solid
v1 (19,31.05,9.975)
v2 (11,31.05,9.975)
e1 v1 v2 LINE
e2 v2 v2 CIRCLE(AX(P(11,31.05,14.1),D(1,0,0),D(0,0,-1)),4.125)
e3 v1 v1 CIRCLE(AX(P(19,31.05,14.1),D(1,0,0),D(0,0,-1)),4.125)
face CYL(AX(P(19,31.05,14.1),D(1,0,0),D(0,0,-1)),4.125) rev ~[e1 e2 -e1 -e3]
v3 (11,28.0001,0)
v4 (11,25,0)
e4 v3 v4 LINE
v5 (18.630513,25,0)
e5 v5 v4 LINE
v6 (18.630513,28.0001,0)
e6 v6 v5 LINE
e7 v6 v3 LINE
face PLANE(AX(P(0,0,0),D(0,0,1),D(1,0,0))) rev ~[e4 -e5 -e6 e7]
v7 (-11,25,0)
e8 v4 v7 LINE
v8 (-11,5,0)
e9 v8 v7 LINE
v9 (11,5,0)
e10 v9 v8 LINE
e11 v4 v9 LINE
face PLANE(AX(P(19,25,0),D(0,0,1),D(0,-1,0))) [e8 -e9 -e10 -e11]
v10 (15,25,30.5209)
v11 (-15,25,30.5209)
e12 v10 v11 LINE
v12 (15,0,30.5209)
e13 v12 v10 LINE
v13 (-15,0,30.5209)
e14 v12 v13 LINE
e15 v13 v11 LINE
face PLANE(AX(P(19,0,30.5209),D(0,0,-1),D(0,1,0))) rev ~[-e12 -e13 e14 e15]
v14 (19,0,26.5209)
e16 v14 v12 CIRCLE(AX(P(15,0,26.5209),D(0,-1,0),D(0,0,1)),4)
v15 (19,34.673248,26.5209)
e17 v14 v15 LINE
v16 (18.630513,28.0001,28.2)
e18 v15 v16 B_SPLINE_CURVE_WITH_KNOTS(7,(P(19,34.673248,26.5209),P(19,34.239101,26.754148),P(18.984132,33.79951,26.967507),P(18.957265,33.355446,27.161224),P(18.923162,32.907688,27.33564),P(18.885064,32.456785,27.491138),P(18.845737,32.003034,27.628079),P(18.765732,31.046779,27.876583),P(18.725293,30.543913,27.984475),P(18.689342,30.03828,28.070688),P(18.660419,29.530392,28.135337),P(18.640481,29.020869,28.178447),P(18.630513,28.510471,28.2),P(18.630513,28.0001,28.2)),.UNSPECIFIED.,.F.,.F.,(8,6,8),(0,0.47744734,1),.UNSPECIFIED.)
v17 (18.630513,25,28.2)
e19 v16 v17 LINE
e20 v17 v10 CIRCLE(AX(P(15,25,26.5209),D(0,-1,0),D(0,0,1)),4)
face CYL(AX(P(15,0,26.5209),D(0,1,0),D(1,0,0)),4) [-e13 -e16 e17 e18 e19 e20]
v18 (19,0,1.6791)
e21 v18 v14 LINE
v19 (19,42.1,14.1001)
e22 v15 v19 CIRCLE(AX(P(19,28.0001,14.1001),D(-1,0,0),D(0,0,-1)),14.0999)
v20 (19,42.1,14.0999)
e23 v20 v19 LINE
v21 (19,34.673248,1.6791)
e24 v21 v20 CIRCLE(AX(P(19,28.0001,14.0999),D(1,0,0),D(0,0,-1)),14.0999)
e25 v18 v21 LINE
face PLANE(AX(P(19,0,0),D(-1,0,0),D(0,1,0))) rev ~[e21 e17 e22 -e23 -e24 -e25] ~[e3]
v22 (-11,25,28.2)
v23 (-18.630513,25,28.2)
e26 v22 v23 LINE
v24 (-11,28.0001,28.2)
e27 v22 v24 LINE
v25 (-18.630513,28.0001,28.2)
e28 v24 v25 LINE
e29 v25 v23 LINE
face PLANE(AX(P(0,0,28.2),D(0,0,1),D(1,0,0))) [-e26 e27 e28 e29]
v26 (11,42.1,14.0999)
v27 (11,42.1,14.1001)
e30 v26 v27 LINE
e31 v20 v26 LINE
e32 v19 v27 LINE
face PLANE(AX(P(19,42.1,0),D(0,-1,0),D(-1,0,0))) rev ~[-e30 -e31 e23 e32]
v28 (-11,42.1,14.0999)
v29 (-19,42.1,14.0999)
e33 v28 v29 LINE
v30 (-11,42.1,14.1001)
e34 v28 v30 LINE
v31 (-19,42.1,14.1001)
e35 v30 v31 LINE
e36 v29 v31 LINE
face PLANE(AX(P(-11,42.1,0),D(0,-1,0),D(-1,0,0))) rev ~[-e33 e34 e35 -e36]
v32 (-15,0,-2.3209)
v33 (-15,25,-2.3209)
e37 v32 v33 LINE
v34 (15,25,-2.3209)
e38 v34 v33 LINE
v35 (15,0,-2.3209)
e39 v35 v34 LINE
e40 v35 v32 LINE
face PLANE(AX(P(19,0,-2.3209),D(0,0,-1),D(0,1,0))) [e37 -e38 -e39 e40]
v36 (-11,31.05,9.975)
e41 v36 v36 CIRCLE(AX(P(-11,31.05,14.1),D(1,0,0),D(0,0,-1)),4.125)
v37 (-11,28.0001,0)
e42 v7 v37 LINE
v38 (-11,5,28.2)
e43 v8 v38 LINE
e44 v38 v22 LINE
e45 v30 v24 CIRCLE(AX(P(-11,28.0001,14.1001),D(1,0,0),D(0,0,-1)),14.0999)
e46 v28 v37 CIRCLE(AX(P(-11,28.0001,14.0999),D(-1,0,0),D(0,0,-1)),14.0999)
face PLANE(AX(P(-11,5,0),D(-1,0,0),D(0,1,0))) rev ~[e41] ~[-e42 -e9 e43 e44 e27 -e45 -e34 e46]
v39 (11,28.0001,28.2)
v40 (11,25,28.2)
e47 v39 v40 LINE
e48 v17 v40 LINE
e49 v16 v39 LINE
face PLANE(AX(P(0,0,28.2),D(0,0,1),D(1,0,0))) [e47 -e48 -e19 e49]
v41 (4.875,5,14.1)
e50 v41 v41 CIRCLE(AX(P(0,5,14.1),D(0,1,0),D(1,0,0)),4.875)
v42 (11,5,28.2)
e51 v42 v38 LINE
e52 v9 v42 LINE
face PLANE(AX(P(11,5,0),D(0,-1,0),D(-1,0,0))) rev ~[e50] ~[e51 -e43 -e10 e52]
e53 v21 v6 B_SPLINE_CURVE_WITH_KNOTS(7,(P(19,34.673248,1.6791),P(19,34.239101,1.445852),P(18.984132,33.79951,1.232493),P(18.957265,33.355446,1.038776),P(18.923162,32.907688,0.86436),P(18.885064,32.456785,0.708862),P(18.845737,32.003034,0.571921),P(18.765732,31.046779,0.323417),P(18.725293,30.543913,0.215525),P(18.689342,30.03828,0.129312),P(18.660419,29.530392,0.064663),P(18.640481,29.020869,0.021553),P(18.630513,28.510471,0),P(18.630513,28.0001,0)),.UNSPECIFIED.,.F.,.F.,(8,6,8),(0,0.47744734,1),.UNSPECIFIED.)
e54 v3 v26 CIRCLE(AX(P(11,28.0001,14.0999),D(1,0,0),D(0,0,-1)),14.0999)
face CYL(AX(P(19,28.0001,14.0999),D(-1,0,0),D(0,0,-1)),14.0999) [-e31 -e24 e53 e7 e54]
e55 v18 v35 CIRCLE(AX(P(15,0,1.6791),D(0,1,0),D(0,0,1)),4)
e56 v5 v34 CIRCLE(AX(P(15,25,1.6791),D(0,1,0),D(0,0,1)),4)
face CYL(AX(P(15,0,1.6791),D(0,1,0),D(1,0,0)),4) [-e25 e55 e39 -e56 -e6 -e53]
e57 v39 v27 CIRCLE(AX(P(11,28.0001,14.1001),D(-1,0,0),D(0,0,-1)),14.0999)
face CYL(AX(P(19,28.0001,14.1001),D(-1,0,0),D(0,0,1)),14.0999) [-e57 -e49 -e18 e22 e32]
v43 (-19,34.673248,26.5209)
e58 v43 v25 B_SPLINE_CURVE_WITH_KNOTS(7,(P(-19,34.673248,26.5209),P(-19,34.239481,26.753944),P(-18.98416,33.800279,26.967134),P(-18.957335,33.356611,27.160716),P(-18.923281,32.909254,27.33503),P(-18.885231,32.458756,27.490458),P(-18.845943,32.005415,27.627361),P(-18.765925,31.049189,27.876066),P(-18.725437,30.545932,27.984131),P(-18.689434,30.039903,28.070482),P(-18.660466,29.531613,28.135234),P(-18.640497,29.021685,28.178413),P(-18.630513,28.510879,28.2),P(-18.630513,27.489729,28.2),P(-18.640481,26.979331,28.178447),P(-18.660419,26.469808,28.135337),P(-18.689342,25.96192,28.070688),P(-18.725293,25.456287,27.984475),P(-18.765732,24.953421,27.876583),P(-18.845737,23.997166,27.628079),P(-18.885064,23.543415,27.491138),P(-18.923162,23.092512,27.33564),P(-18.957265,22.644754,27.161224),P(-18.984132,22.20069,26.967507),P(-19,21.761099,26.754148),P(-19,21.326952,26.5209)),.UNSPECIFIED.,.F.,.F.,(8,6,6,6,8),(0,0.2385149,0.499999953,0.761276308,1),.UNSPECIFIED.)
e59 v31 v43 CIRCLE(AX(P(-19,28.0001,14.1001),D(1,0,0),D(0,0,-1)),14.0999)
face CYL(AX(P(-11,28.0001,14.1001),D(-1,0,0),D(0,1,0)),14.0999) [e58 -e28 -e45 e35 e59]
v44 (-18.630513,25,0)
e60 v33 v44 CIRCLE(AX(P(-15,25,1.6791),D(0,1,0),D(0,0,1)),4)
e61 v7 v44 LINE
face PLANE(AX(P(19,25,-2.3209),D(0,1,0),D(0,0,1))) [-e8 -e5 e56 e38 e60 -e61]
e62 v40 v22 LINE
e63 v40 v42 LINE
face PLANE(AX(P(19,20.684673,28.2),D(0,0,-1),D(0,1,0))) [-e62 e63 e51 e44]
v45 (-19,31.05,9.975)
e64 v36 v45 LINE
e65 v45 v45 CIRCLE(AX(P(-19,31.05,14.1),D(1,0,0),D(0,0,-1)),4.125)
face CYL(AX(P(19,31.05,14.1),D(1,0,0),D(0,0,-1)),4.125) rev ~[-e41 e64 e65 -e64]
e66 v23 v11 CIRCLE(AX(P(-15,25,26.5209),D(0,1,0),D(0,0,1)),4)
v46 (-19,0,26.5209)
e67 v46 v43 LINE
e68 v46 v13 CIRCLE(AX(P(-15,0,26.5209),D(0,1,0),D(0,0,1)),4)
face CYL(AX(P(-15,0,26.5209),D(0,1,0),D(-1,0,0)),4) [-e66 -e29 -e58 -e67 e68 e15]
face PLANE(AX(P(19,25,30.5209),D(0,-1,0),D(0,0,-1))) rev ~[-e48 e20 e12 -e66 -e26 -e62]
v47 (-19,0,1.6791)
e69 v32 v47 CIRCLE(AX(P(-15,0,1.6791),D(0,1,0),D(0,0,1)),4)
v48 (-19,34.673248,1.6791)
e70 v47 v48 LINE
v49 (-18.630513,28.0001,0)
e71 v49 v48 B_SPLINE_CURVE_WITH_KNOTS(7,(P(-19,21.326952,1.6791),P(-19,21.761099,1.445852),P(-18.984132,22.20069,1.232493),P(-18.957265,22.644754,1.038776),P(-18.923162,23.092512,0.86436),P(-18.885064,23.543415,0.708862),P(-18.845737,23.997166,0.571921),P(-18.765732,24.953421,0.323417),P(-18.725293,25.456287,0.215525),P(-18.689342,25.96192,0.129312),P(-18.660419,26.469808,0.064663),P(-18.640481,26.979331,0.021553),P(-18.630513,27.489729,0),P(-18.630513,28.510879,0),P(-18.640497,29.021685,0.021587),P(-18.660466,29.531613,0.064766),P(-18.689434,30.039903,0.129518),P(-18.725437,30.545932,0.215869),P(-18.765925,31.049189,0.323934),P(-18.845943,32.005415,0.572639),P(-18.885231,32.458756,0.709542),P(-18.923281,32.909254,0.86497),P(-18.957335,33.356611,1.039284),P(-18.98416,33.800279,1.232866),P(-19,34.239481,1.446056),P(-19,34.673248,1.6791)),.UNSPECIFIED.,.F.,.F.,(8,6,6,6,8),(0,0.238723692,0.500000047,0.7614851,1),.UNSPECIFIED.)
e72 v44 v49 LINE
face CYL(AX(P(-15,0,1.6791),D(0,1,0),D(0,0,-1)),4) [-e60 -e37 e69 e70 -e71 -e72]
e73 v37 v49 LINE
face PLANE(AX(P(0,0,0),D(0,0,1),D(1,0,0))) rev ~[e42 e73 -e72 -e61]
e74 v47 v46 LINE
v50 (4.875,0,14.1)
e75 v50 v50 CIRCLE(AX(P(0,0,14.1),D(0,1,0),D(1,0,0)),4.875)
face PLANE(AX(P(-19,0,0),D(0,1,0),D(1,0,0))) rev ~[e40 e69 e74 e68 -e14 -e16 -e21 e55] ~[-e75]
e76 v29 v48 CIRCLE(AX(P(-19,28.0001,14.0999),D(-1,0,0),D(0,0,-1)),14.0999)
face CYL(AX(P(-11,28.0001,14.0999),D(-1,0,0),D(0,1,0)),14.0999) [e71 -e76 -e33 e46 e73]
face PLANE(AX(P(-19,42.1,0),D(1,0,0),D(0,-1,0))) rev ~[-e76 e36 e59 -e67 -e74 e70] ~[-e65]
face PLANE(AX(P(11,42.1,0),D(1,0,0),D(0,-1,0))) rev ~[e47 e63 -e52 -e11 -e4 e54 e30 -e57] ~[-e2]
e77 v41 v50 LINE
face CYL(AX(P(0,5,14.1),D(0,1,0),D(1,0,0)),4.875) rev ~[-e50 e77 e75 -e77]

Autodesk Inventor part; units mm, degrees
ref_plane "YZ Plane" through (0, 0, 0) normal (1, 0, 0) x (0, 1, 0)
ref_plane "XZ Plane" through (0, 0, 0) normal (0, 1, 0) x (-1, 0, 0)
ref_plane "XY Plane" through (0, 0, 0) normal (0, 0, 1) x (1, 0, 0)
sketch "Sketch1" plane through (0, 0, 0) normal (0, 0, 1) x (1, 0, 0)
  line L0 (-19, 0) -> (19, 0)
  line L1 (19, 0) -> (19, 42.1)
  line L2 (19, 42.1) -> (11, 42.1)
  line L3 (11, 42.1) -> (11, 5)
  line L4 (11, 5) -> (-11, 5)
  line L5 (-11, 5) -> (-11, 42.1)
  line L6 (-11, 42.1) -> (-19, 42.1)
  line L7 (-19, 42.1) -> (-19, 0)
  point P0 (0, 0)
  dimension "d0" = 22
  dimension "d1" = 5
  dimension "d2" = 37.1
  dimension "d14" = 8
  dimension "d15" = 8
  dimension "d26" = 47.0273
extrude "Extrusion1" add sketch "Sketch1" along normal blind 28.2
sketch "Sketch2" plane through (-11, 5, 0) normal (0, 1, 0) x (1, 0, 0)
  circle A0 centre (11, -14.1) radius 4.875
  line L0 (22, 0) -> (0, 0) projected
  line L1 (-8, 0) -> (-8, -28.2) projected
  point P0 (11, 0)
  point P1 (11, 0)
  point P2 (-8, -14.1)
  dimension "d6" = 9.75
extrude "Extrusion2" cut sketch "Sketch2" against normal up to next
sketch "Sketch3" plane through (19, 0, 0) normal (1, 0, 0) x (0, 0, -1)
  line L0 (0, 5) -> (-28.2, 5) projected
  circle A0 centre (-14.1, 31.05) radius 4.125
  line L1 (0, 0) -> (0, 42.1) projected
  line L2 (0, 42.1) -> (-28.2, 42.1) projected
  point P0 (-14.1, 42.1)
  dimension "d9" = 8.25
  dimension "d11" = 26.05
extrude "Extrusion3" cut sketch "Sketch3" against normal through all
sketch "Sketch4" plane through (19, 0, 0) normal (1, 0, 0) x (0, 0, -1)
  line L0 (-28.2, 0) -> (-28.2, 42.1) projected
  line L1 (-28.2, 27.157) -> (-28.2, 0)
  circle A0 centre (-14.1, 31.05) radius 17.5
  circle A1 centre (-14.1, 31.05) radius 14.1
  line L2 (-28.2, 0) -> (-30.5209, 0)
  line L3 (-30.5209, 0) -> (-30.5209, 25)
  line L4 (-30.5209, 25) -> (-28.2, 25)
  line L5 (-28.2, 25) -> (-28.2, 0)
  line L6 (0, 0) -> (2.3209, 0)
  line L7 (2.3209, 0) -> (2.3209, 25)
  line L8 (2.3209, 25) -> (0, 25)
  line L9 (0, 25) -> (0, 0)
  dimension "d23" = 35
  dimension "d24" = 28.2
  dimension "d25" = 25
extrude "Extrusion4" add sketch "Sketch4" against normal up to surface (38 mm away) contours L0 A0 L4 | L0 L2 L3 A0 | L9 L8 A0 | A0 L7 L6 L9 picked at (-28.5025, 22.5777)
full round fillet "Full Round Fillet1" first side at (-13.6667, 36.4, 28.2) centre faces at (-13.6667, 42.1, 9.4) second side at (-13.6667, 36.4, 0)
full round fillet "Full Round Fillet2" first side at (13.6667, 36.4, 28.2) centre faces at (16.3333, 42.1, 9.4) second side at (13.6667, 36.4, 0)
fillet "Fillet1" radius 4 4 edges at (-19, 12.5, 30.5209) (19, 12.5, 30.5209) (19, 12.5, -2.3209) (-19, 12.5, -2.3209)
properties part number "pulley_base"
